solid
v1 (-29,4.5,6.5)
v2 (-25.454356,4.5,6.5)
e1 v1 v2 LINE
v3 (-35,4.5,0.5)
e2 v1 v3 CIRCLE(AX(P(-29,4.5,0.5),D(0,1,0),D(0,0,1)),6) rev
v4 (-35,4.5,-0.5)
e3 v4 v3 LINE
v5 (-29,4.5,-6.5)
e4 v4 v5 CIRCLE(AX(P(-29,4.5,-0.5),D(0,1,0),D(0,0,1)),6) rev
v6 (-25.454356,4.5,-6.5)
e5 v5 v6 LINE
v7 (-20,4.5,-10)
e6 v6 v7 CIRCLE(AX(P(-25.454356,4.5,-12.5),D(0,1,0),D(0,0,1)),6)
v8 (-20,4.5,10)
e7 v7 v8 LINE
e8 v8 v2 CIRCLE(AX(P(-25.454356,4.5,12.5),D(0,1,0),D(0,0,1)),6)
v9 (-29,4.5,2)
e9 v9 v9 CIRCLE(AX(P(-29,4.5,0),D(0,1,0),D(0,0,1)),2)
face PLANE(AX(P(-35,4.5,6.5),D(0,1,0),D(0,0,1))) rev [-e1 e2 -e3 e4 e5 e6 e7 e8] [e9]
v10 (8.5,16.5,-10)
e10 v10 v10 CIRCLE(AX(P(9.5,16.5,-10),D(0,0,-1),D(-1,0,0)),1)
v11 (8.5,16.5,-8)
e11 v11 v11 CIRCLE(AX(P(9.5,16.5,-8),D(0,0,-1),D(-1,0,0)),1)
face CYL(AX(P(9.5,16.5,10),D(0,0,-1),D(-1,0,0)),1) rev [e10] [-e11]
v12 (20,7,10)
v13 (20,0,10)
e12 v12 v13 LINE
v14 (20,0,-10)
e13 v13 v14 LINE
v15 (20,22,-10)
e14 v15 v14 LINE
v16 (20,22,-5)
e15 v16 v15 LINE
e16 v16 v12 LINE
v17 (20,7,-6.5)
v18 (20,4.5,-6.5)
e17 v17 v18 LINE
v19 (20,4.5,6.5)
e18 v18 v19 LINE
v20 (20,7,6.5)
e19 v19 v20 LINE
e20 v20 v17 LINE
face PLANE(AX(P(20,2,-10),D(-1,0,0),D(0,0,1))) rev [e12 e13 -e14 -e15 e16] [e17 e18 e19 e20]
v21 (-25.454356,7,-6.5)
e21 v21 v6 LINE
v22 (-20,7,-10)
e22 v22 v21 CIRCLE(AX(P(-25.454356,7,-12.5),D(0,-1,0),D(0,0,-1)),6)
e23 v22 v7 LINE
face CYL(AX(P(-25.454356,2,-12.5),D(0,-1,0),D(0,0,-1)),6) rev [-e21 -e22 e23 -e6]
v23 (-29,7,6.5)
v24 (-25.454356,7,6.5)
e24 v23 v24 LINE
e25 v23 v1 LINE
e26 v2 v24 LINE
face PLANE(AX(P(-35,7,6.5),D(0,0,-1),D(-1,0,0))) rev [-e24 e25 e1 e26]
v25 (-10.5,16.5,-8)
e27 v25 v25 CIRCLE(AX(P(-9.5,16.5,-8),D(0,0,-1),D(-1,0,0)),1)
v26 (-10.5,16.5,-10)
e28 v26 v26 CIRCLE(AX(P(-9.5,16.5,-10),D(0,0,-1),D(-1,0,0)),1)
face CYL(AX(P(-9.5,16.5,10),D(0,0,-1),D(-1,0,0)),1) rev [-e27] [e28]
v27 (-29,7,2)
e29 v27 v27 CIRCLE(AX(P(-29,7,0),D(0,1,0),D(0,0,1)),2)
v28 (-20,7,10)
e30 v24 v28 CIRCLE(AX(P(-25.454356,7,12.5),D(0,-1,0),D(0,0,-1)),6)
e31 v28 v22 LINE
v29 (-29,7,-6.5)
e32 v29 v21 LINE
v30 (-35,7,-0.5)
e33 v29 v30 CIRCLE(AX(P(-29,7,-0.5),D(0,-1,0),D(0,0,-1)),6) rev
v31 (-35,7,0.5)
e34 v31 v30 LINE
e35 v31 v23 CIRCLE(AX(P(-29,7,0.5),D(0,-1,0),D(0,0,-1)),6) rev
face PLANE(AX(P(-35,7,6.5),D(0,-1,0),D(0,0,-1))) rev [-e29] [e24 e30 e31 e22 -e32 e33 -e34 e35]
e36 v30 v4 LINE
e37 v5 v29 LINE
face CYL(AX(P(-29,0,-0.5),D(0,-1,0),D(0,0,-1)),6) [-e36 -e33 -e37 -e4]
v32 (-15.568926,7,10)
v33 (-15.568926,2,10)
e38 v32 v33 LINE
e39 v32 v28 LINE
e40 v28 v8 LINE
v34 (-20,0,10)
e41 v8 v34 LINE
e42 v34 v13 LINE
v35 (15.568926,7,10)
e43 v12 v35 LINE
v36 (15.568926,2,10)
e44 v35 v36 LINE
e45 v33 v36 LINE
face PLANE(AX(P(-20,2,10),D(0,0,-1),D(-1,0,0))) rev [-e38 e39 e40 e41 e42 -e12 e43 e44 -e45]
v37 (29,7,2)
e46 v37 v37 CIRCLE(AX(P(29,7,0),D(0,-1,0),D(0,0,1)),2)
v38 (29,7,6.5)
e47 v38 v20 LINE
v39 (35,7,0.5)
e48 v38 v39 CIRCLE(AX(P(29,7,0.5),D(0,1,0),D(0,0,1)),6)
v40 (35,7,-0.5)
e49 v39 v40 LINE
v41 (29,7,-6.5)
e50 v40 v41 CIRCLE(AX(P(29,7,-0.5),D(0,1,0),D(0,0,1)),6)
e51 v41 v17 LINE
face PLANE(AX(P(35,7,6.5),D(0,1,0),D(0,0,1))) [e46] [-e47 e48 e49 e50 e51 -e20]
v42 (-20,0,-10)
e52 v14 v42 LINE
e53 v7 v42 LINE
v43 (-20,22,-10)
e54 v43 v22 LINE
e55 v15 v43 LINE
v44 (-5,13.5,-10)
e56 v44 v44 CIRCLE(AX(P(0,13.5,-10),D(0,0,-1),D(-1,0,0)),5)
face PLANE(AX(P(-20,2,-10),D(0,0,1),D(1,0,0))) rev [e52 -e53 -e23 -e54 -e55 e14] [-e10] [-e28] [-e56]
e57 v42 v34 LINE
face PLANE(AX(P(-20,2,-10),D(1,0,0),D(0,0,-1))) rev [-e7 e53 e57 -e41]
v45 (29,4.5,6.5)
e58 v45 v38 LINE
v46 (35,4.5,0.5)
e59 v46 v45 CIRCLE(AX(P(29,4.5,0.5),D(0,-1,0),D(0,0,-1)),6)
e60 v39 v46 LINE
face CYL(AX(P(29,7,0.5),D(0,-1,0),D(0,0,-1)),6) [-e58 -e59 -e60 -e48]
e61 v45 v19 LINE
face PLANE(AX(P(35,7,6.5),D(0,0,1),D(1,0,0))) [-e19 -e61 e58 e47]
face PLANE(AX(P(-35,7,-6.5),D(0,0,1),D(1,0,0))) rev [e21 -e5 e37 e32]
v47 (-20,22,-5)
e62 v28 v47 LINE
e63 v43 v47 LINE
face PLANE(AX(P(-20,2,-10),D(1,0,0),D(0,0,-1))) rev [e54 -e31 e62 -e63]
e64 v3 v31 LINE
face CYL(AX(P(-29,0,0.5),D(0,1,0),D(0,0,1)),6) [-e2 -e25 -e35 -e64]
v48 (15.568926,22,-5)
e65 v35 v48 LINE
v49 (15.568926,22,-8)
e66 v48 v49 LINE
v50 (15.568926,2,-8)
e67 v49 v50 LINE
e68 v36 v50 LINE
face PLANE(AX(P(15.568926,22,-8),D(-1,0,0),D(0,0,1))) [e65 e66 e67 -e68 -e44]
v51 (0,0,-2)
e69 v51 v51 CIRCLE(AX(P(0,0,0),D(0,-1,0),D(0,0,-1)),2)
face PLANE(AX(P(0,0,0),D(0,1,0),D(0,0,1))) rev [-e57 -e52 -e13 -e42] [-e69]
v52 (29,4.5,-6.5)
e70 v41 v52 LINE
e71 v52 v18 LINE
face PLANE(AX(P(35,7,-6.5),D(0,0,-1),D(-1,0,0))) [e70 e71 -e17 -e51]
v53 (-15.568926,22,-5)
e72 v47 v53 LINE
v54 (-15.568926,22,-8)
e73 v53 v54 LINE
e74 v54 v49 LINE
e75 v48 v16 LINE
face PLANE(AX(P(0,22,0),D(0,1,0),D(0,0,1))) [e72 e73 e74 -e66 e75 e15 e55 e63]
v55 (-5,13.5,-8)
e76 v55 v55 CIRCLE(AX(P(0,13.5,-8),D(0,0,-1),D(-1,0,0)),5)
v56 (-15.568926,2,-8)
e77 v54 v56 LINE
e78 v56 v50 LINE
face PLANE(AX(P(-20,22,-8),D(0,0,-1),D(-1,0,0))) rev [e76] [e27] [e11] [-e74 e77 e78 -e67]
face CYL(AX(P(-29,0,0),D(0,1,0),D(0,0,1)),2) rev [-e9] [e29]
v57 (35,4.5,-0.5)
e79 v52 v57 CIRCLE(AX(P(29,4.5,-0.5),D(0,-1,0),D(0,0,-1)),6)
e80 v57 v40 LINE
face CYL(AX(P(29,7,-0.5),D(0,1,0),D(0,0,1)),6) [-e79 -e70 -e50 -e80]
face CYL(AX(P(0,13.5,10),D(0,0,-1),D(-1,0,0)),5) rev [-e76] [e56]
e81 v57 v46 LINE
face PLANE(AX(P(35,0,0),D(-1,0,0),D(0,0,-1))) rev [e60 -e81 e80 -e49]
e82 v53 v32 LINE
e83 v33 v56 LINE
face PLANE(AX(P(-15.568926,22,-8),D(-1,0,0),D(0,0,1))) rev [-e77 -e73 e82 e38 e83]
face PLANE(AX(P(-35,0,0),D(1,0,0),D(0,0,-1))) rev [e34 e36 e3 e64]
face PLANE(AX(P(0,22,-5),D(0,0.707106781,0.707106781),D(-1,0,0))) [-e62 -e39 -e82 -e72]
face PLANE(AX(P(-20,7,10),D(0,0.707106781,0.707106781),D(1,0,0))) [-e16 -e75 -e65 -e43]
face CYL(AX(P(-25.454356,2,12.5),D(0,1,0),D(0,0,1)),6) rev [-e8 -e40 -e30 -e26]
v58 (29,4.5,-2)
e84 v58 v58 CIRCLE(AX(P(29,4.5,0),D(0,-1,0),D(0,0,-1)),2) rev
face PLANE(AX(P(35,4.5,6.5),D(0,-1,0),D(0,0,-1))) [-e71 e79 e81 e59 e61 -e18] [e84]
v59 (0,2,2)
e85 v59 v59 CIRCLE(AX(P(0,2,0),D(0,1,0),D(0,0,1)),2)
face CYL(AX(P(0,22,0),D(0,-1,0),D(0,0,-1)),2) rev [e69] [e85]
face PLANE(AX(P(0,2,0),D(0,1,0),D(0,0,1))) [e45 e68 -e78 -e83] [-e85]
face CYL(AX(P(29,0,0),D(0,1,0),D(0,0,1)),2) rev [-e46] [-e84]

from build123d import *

# Parameters (mm, degrees)
SKETCH1_W           = 40
SKETCH1_H           = 20
BOSS_EXTRUDE1_DEPTH = 2
SKETCH2_W           = 40
SKETCH2_H           = 2
BOSS_EXTRUDE2_DEPTH = 20
SKETCH4_R           = 5
SKETCH4_R_2         = 1
CUT_EXTRUDE2_DEPTH  = 36.832945734
SKETCH5_R           = 2
CUT_EXTRUDE3_DEPTH  = 32.368774283
SKETCH6_W           = 4.431073847
SKETCH6_H           = 18
BOSS_EXTRUDE3_DEPTH = 20
CHAMFER1_SIZE       = 15
SKETCH7_W           = 13
SKETCH7_H           = 2.5
BOSS_EXTRUDE4_DEPTH = 15
FILLET1_R           = 6
SKETCH8_R           = 2
CUT_EXTRUDE4_DEPTH  = 40.37003937
MIRROR1_START       = 4.5
MIRROR1_OUTLINE_R   = 2
MIRROR1_DEPTH       = 2.5
MIRROR1_START_2     = 2
MIRROR1_2_OUTLINE_W = 4.431073847
MIRROR1_2_OUTLINE_H = 18
MIRROR1_2_DEPTH     = 2.5
MIRROR1_START_3     = 15.568926153
MIRROR1_3_DEPTH     = 4.431073847


with BuildPart() as part:
    # Sketch1 → Boss-Extrude1 (new body)
    with BuildSketch(Plane(origin=(0, 0, 0), x_dir=(1, 0, 0), z_dir=(0, 1, 0))):
        Rectangle(SKETCH1_W, SKETCH1_H)
    extrude(amount=BOSS_EXTRUDE1_DEPTH)

    # Sketch2 → Boss-Extrude2 (add)
    with BuildSketch(Plane(origin=(0, 2, 0), x_dir=(1, 0, 0), z_dir=(0, 1, 0))):
        with Locations((0, 9)):
            Rectangle(SKETCH2_W, SKETCH2_H)
    extrude(amount=BOSS_EXTRUDE2_DEPTH)

    # Sketch4 → Cut-Extrude2 (cut, through all)
    with BuildSketch(Plane(origin=(0, 0, -10), x_dir=(-1, 0, 0), z_dir=(0, 0, -1))):
        with Locations((0, 13.5)):
            Circle(SKETCH4_R)
        with Locations((-9.5, 16.5)):
            Circle(SKETCH4_R_2)
        with Locations((9.5, 16.5)):
            Circle(SKETCH4_R_2)
    extrude(amount=-CUT_EXTRUDE2_DEPTH, mode=Mode.SUBTRACT)

    # Sketch5 → Cut-Extrude3 (cut, through all)
    with BuildSketch(Plane.XZ):
        with Locations(Location((0, 0, 0), (0, 0, 270))):
            Circle(SKETCH5_R)
    extrude(amount=-CUT_EXTRUDE3_DEPTH, mode=Mode.SUBTRACT)

    # Sketch6 → Boss-Extrude3 (add)
    with BuildSketch(Plane(origin=(0, 2, 0), x_dir=(1, 0, 0), z_dir=(0, 1, 0))):
        with Locations((-17.784463076, -1)):
            Rectangle(SKETCH6_W, SKETCH6_H)
    extrude(amount=BOSS_EXTRUDE3_DEPTH)

    # Chamfer1
    chamfer1_edges = [part.edges().sort_by_distance(p)[0] for p in [
        (-17.784463077, 22, 10),
    ]]
    chamfer(chamfer1_edges, length=CHAMFER1_SIZE)

    # Sketch7 → Boss-Extrude4 (add)
    with BuildSketch(Plane.ZY.offset(20)):
        with Locations((0, 5.75)):
            Rectangle(SKETCH7_W, SKETCH7_H)
    extrude(amount=BOSS_EXTRUDE4_DEPTH)

    # Fillet1
    # the kernel refuses this fillet: 6 mm, written as the material it adds along each edge
    with BuildSketch(Plane(origin=(-20, 4.5, 6.5), x_dir=(0, 0, 1), z_dir=(0, 1, 0)), Plane(origin=(-20, 7, -6.5), x_dir=(0, 0, -1), z_dir=(0, -1, 0))) as fillet1_piece_1:
        with BuildLine():
            CenterArc((6, -5.454356057), FILLET1_R, 114.624318352, 65.375681648)
            Line((0, -5.454356057), (0, 0))
            Line((0, 0), (3.5, 0))
        make_face()
    extrude(amount=2.5)
    # the kernel refuses this fillet: 6 mm, written as the material it takes off along each edge
    with BuildSketch(Plane(origin=(-35, -10.5, 6.5), x_dir=(1, 0, 0), z_dir=(0, 1, 0))) as fillet1_2_piece_1:
        with BuildLine():
            CenterArc((FILLET1_R, FILLET1_R), FILLET1_R, 180, 90)
            Line((0, FILLET1_R), (0, 0))
            Line((0, 0), (FILLET1_R, 0))
        make_face()
    extrude(amount=32.5, mode=Mode.SUBTRACT)
    with BuildSketch(Plane(origin=(-35, 22, -6.5), x_dir=(0, 0, 1), z_dir=(0, -1, 0))) as fillet1_2_piece_2:
        with BuildLine():
            CenterArc((FILLET1_R, -FILLET1_R), FILLET1_R, 90, 90)
            Line((0, -FILLET1_R), (0, 0))
            Line((0, 0), (FILLET1_R, 0))
        make_face()
    extrude(amount=32.5, mode=Mode.SUBTRACT)

    # Sketch8 → Cut-Extrude4 (cut, through all)
    with BuildSketch(Plane(origin=(0, 7, 0), x_dir=(1, 0, 0), z_dir=(0, 1, 0))):
        with Locations(Location((-29, 0, 0), (0, 0, 270))):
            Circle(SKETCH8_R)
    extrude(amount=-CUT_EXTRUDE4_DEPTH, mode=Mode.SUBTRACT)

    # Mirror1: read off the stored shape, not the designer's step
    # Mirror1 outline → Mirror1 (add)
    with BuildSketch(Plane(origin=(0, 0, 0), x_dir=(1, 0, 0), z_dir=(0, 1, 0)).offset(MIRROR1_START)):
        with BuildLine():
            Line((20, 6.5), (20, 8))
            Line((20, 8), (15.568926153, 8))
            Line((15.568926153, 8), (15.568926153, -10))
            Line((15.568926153, -10), (20, -10))
            Line((20, -10), (20, -6.5))
            Line((20, -6.5), (29, -6.5))
            ThreePointArc((29, -6.5), (33.242640687, -4.742640687), (35, -0.5))
            Line((35, -0.5), (35, 0.5))
            ThreePointArc((35, 0.5), (33.242640687, 4.742640687), (29, 6.5))
            Line((29, 6.5), (20, 6.5))
        make_face()
        with Locations((29, 0)):
            Circle(MIRROR1_OUTLINE_R, mode=Mode.SUBTRACT)
    extrude(amount=MIRROR1_DEPTH)

    # Mirror1 2 outline → Mirror1 2 (add)
    with BuildSketch(Plane(origin=(0, 0, 0), x_dir=(1, 0, 0), z_dir=(0, 1, 0)).offset(MIRROR1_START_2)):
        with Locations((17.784463076, -1)):
            Rectangle(MIRROR1_2_OUTLINE_W, MIRROR1_2_OUTLINE_H)
    extrude(amount=MIRROR1_2_DEPTH)

    # Mirror1 3 outline → Mirror1 3 (add)
    with BuildSketch(Plane.YZ.offset(MIRROR1_START_3)):
        Polygon((7, -8), (22, -8), (22, -5), (7, 10), align=None)
    extrude(amount=MIRROR1_3_DEPTH)


solid = part.part
